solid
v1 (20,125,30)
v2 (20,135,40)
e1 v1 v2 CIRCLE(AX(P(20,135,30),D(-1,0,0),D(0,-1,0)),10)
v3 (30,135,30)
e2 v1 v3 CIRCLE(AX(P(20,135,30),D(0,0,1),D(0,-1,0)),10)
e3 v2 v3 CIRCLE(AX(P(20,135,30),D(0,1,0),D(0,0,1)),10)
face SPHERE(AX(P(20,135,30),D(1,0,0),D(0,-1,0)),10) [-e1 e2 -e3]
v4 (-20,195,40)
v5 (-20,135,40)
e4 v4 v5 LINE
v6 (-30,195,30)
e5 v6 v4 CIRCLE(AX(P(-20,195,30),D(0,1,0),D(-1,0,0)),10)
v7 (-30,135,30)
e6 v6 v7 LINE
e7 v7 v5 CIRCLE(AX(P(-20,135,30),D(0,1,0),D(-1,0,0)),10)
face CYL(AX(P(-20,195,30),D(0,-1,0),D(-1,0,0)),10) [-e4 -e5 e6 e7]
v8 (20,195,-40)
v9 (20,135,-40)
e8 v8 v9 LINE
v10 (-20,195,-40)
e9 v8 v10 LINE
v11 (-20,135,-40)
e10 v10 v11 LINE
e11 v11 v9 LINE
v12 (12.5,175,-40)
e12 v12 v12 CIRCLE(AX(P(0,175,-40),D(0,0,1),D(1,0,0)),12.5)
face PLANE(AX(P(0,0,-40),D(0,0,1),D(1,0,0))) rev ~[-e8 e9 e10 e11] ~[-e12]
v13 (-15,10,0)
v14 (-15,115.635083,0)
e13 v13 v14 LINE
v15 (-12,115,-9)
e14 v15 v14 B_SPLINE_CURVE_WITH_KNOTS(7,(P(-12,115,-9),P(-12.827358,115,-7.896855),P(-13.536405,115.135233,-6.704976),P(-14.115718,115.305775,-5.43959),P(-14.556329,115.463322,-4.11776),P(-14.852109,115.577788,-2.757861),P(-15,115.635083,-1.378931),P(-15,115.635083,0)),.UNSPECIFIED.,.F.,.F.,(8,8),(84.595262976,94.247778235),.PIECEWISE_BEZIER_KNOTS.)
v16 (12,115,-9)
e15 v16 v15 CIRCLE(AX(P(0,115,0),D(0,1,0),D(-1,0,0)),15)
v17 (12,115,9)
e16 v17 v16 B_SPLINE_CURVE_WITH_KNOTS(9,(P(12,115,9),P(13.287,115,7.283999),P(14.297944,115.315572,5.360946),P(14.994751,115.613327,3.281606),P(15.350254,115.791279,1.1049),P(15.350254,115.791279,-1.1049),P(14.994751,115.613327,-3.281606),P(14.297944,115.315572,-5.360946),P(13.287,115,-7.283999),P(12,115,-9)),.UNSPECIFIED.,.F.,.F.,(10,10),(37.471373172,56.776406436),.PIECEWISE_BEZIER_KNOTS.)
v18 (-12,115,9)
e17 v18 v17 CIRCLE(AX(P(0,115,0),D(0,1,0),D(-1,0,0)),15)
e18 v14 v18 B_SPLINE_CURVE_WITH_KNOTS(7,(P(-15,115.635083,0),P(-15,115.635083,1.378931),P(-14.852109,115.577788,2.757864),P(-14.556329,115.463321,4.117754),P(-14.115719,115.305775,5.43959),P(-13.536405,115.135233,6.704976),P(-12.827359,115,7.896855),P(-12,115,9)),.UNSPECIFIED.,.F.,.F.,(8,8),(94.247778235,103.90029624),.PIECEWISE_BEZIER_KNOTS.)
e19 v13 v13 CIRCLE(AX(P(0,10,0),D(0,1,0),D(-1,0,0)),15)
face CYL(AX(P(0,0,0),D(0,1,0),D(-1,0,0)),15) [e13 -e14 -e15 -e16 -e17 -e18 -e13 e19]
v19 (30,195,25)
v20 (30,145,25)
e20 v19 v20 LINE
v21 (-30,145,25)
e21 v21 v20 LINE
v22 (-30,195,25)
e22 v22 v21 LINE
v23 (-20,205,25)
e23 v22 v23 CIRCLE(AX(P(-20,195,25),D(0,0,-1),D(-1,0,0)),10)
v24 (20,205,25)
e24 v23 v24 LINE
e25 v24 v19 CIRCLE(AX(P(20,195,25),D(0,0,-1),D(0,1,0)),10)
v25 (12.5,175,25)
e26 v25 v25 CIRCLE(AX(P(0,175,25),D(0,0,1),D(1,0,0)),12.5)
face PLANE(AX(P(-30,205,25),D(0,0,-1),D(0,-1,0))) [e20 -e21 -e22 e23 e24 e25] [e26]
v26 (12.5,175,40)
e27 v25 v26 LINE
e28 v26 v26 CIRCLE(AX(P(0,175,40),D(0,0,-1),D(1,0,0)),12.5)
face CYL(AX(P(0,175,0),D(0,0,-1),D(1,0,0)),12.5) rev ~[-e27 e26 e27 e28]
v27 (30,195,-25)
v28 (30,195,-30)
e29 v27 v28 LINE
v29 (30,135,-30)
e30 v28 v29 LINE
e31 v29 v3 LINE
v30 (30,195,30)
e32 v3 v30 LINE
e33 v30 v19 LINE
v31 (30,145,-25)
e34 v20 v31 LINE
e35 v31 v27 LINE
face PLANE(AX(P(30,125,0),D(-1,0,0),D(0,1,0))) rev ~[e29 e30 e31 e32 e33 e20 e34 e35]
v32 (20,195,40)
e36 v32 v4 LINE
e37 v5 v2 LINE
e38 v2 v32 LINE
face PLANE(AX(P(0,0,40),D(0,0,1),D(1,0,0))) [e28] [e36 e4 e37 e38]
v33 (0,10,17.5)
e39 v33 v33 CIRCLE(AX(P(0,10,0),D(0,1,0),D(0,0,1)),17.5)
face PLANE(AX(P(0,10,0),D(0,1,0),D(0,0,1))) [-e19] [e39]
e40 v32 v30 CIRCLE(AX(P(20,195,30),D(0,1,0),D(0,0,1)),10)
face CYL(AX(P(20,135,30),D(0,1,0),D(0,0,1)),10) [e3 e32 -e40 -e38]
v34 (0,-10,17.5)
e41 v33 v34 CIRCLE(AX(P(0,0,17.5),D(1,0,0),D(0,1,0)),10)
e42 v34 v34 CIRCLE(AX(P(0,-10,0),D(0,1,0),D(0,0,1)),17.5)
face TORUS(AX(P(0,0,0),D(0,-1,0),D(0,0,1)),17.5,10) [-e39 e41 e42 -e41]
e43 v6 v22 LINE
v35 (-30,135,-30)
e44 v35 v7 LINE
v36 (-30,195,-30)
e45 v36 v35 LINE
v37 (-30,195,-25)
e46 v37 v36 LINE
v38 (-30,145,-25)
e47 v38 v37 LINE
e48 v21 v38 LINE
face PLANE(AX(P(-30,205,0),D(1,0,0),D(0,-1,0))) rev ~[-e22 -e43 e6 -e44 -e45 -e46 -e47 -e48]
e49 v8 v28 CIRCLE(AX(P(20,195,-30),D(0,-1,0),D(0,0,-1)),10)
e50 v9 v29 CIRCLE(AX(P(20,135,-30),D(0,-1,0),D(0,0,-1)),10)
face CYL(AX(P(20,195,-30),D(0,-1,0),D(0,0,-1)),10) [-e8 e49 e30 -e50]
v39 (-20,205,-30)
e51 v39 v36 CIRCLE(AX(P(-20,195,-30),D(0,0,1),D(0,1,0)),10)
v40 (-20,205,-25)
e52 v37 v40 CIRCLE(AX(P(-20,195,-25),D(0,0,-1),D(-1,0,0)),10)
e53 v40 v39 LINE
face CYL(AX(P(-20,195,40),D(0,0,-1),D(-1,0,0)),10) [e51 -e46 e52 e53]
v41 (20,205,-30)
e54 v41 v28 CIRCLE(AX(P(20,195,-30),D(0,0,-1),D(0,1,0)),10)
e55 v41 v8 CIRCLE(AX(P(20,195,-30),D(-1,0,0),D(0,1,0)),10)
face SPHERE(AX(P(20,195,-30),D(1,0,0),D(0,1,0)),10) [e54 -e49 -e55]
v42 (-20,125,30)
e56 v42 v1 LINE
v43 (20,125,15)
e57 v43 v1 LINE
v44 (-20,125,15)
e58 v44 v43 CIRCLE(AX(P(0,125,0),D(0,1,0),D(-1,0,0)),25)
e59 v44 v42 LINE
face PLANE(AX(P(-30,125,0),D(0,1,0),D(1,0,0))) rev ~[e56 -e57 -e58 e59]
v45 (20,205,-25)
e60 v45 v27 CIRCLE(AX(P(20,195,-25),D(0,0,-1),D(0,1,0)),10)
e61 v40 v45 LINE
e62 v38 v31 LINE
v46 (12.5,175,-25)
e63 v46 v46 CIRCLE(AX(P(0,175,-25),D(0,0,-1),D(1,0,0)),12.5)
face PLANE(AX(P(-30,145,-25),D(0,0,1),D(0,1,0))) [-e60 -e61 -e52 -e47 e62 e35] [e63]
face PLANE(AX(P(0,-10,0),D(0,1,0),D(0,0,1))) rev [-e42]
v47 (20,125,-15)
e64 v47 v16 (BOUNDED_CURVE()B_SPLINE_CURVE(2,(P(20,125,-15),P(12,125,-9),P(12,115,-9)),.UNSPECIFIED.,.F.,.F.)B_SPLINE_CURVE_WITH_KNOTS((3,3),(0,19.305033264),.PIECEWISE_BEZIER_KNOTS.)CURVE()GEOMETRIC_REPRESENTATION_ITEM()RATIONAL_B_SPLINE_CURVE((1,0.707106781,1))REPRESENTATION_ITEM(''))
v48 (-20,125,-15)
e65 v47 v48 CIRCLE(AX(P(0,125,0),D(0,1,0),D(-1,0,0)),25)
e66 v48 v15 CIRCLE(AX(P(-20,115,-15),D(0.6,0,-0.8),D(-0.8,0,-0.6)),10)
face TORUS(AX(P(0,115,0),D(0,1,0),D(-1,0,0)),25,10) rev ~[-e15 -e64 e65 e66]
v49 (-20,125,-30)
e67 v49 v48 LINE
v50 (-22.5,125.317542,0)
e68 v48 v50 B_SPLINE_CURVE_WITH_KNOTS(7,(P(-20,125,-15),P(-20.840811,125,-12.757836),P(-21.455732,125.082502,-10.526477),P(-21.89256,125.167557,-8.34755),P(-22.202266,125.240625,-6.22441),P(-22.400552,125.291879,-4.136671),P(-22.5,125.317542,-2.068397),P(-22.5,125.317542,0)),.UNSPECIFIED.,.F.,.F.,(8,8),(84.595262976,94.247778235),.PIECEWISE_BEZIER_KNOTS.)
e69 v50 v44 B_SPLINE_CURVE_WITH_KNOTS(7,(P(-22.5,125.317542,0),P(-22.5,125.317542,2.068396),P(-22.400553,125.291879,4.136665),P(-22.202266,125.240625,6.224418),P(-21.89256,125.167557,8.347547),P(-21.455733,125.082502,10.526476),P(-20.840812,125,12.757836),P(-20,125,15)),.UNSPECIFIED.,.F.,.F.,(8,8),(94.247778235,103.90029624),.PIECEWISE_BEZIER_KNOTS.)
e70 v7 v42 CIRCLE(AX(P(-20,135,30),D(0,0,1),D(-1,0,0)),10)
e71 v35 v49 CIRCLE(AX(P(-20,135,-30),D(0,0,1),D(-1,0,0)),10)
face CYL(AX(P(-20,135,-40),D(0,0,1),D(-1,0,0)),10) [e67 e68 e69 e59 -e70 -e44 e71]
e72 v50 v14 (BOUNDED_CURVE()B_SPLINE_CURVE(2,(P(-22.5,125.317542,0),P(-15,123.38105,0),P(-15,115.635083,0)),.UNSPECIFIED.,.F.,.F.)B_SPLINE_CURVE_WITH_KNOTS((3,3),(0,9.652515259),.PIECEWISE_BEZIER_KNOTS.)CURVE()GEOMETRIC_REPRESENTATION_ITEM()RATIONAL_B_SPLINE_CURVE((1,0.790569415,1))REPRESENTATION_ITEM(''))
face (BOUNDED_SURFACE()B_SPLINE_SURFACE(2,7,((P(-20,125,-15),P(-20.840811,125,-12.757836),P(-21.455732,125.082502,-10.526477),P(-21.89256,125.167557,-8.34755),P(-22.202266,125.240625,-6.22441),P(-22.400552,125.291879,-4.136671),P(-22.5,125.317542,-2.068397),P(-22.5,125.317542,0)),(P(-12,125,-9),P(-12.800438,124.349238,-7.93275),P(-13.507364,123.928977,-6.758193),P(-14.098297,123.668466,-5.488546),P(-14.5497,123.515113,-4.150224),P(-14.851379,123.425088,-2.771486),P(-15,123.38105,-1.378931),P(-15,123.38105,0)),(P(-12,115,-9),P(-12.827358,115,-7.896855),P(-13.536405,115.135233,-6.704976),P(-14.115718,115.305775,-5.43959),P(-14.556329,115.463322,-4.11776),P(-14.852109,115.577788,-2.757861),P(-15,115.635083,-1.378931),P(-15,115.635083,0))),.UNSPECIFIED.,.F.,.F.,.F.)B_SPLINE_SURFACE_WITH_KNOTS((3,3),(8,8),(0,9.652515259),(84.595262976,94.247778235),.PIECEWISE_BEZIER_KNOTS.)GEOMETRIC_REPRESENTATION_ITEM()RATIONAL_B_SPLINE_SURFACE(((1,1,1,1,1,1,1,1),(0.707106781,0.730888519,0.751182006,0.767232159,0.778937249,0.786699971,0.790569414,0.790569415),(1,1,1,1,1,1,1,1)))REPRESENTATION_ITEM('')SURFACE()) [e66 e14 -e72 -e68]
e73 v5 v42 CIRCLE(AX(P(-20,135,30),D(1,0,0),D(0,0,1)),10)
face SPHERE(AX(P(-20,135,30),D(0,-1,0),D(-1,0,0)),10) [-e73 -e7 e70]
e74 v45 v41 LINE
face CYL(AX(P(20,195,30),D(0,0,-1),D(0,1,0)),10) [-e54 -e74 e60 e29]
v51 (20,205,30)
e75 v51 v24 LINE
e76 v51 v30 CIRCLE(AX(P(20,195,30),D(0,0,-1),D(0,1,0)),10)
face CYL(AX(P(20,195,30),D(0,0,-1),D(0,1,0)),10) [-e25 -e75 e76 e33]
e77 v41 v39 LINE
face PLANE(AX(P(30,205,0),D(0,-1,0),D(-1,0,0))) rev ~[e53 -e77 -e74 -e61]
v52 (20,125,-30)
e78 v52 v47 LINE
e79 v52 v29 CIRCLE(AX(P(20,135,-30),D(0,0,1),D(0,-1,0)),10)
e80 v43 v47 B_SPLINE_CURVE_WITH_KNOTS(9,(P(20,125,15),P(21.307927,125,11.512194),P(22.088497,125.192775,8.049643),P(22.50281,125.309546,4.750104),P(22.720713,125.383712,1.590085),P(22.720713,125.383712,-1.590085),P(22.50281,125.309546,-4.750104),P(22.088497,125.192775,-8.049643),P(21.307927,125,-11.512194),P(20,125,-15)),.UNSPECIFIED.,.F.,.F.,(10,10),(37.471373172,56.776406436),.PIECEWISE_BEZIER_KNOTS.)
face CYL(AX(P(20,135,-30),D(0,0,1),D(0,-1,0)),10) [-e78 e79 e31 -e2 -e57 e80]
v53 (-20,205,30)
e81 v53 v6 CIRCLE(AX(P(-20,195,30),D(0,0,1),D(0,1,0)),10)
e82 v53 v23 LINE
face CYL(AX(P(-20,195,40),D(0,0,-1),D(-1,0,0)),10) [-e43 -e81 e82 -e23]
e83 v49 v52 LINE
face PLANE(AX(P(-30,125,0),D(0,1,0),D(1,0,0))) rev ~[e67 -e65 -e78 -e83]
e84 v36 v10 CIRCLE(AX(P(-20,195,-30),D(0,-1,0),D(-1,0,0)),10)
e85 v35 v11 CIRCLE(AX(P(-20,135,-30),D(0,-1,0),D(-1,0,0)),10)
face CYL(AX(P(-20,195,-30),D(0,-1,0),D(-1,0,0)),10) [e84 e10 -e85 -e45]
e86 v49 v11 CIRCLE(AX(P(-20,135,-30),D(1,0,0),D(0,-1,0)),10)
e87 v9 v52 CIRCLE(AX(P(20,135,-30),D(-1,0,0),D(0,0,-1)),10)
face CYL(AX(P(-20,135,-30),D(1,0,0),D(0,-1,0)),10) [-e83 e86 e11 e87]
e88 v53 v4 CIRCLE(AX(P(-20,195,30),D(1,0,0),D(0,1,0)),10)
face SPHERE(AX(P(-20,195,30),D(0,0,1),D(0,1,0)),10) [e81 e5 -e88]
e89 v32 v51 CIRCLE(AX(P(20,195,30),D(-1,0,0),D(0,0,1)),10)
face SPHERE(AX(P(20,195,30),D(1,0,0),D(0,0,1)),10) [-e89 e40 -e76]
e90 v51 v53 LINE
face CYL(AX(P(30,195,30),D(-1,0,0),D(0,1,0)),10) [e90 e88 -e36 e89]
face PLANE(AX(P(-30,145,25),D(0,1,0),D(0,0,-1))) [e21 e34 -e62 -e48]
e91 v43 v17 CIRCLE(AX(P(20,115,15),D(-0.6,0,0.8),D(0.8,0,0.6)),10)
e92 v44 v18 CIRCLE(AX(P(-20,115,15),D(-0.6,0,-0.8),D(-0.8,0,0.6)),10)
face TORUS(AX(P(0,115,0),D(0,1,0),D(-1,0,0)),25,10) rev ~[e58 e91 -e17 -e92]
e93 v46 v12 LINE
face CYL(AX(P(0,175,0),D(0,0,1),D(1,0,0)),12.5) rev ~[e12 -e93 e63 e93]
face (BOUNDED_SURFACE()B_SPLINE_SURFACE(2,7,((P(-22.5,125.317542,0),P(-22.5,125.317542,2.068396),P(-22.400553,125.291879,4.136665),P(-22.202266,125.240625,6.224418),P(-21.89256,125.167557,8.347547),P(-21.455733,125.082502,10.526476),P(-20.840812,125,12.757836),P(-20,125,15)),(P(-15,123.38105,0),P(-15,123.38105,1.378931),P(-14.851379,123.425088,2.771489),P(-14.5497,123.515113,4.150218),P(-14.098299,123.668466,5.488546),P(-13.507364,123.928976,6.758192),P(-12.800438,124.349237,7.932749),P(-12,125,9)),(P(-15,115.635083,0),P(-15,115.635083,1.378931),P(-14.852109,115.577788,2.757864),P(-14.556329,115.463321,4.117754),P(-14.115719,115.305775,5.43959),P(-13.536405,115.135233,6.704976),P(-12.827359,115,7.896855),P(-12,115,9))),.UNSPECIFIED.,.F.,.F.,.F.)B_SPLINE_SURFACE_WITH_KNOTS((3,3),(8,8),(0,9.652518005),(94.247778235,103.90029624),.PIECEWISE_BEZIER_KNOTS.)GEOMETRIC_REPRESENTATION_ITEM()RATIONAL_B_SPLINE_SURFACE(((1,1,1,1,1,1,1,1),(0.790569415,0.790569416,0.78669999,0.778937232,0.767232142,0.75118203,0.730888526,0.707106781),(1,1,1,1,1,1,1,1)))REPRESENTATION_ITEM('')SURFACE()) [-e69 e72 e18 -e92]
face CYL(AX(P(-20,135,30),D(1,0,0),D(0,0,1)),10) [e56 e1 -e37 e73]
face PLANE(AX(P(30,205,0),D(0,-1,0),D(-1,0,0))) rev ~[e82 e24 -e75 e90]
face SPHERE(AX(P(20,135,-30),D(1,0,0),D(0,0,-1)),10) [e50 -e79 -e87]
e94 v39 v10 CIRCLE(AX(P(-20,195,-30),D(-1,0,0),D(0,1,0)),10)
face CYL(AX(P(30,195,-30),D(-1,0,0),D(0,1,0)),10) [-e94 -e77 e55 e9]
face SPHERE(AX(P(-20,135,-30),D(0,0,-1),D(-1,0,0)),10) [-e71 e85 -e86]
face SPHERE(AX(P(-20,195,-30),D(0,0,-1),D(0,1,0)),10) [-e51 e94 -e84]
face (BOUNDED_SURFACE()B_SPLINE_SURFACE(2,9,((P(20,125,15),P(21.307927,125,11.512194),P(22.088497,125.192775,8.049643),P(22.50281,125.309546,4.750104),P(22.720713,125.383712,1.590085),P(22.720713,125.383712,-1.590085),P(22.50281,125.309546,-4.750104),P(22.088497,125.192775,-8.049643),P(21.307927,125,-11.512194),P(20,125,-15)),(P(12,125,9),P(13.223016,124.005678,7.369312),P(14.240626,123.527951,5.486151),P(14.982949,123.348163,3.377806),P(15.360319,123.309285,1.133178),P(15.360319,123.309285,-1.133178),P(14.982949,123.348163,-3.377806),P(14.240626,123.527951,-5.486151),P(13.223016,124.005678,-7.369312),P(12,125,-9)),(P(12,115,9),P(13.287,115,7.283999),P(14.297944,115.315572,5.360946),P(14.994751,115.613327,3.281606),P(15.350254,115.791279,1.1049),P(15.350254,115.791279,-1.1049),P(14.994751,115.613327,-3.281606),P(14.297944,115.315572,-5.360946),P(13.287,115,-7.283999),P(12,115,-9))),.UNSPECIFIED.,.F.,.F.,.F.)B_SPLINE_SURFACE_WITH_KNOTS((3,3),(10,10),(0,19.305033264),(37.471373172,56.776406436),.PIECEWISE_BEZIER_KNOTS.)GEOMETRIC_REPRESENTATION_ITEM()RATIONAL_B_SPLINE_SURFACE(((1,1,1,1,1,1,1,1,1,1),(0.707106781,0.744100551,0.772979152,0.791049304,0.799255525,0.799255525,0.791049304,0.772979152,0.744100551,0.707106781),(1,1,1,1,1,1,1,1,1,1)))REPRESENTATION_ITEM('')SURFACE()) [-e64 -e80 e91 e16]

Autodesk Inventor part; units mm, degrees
ref_plane "YZ Plane" through (0, 0, 0) normal (1, 0, 0) x (0, 1, 0)
ref_plane "XZ Plane" through (0, 0, 0) normal (0, 1, 0) x (-1, 0, 0)
ref_plane "XY Plane" through (0, 0, 0) normal (0, 0, 1) x (1, 0, 0)
sketch "Sketch1" plane through (0, 0, 0) normal (0, 0, 1) x (1, 0, 0)
  line L0 (0, 0) -> (0, 125)
  dimension "d0" = 125
sketch "Sketch2" plane through (0, 0, 0) normal (0, 1, 0) x (-1, 0, 0)
  circle A0 centre (0, 0) radius 15
  dimension "d3" = 30
sweep "Sweep1" add profiles "Sketch2" path "Sketch1"
sketch "Sketch4" plane through (0, 0, 0) normal (1, 0, 0) x (0, 1, 0)
  line L0 (0, 17.5) -> (0, -17.5) construction
  line L1 (10, 17.5) -> (10, -17.5)
  line L2 (-10, -17.5) -> (-10, 17.5)
  arc A0 (10, 17.5) -> (-10, 17.5) centre (0, 17.5) ccw
  arc A1 (-10, -17.5) -> (10, -17.5) centre (0, -17.5) ccw
  line L3 (-10, 0) -> (10, 0)
  point P0 (0, 0)
  dimension "d9" = 35
  dimension "d10" = 10
revolve "Revolution1" add sketch "Sketch4" angle 360 about axis through (0, -10, 0) along (0, 1, 0) contours L1 L3 L2 A0
sketch "Sketch5" plane through (0, 0, 0) normal (0, 0, 1) x (1, 0, 0)
  line L0 (-30, 125) -> (30, 125)
  line L1 (30, 125) -> (30, 205)
  line L2 (30, 205) -> (-30, 205)
  line L3 (-30, 205) -> (-30, 125)
  circle A0 centre (0, 175) radius 12.5
  line L4 (0, 0) -> (0, 125) construction
  line L5 (0, 175) -> (0, 125)
  dimension "d12" = 175
  dimension "d13" = 25
  dimension "d14" = 60
  dimension "d15" = 30
extrude "Extrusion1" add sketch "Sketch5" along normal mid plane 80
sketch "Sketch7" plane through (-30, 125, 40) normal (-1, 0, 0) x (0, 0, 1)
  line L0 (-80, 80) -> (0, 80) construction
  line L1 (-65, 80) -> (-15, 80)
  line L2 (-15, 80) -> (-15, 20)
  line L3 (-15, 20) -> (-65, 20)
  line L4 (-65, 20) -> (-65, 80)
  line L5 (-80, 37.5) -> (-80, 62.5) construction
  line L6 (0, 62.5) -> (0, 37.5) construction
  line L7 (-80, 0) -> (-80, 80) construction
  line L8 (-80, 50) -> (0, 50) construction
  line L9 (0, 80) -> (0, 0) construction
  line L10 (-40, 50) -> (-40, 0) construction
  point P0 (-40, -125)
  dimension "d18" = 30
  dimension "d19" = 50
  dimension "d20" = 25
  dimension "d21" = 175
fillet "Fillet1" radius 10 13 edges at (-30, 165, 40) (30, 165, 40) (-30, 165, -40) (30, 165, -40) (-30, 125, 0) (0, 125, -40) (0, 125, 40) (30, 125, 0) (15, 125, 0) (-30, 205, 0) (0, 205, 40) (30, 205, 0) (0, 205, -40)
extrude "Extrusion2" cut sketch "Sketch7" against normal through all
equation "\"d20\" = 0.5 * d19"
equation "\"d21\" = d12"
properties part number "Elo-Bola Longo"
